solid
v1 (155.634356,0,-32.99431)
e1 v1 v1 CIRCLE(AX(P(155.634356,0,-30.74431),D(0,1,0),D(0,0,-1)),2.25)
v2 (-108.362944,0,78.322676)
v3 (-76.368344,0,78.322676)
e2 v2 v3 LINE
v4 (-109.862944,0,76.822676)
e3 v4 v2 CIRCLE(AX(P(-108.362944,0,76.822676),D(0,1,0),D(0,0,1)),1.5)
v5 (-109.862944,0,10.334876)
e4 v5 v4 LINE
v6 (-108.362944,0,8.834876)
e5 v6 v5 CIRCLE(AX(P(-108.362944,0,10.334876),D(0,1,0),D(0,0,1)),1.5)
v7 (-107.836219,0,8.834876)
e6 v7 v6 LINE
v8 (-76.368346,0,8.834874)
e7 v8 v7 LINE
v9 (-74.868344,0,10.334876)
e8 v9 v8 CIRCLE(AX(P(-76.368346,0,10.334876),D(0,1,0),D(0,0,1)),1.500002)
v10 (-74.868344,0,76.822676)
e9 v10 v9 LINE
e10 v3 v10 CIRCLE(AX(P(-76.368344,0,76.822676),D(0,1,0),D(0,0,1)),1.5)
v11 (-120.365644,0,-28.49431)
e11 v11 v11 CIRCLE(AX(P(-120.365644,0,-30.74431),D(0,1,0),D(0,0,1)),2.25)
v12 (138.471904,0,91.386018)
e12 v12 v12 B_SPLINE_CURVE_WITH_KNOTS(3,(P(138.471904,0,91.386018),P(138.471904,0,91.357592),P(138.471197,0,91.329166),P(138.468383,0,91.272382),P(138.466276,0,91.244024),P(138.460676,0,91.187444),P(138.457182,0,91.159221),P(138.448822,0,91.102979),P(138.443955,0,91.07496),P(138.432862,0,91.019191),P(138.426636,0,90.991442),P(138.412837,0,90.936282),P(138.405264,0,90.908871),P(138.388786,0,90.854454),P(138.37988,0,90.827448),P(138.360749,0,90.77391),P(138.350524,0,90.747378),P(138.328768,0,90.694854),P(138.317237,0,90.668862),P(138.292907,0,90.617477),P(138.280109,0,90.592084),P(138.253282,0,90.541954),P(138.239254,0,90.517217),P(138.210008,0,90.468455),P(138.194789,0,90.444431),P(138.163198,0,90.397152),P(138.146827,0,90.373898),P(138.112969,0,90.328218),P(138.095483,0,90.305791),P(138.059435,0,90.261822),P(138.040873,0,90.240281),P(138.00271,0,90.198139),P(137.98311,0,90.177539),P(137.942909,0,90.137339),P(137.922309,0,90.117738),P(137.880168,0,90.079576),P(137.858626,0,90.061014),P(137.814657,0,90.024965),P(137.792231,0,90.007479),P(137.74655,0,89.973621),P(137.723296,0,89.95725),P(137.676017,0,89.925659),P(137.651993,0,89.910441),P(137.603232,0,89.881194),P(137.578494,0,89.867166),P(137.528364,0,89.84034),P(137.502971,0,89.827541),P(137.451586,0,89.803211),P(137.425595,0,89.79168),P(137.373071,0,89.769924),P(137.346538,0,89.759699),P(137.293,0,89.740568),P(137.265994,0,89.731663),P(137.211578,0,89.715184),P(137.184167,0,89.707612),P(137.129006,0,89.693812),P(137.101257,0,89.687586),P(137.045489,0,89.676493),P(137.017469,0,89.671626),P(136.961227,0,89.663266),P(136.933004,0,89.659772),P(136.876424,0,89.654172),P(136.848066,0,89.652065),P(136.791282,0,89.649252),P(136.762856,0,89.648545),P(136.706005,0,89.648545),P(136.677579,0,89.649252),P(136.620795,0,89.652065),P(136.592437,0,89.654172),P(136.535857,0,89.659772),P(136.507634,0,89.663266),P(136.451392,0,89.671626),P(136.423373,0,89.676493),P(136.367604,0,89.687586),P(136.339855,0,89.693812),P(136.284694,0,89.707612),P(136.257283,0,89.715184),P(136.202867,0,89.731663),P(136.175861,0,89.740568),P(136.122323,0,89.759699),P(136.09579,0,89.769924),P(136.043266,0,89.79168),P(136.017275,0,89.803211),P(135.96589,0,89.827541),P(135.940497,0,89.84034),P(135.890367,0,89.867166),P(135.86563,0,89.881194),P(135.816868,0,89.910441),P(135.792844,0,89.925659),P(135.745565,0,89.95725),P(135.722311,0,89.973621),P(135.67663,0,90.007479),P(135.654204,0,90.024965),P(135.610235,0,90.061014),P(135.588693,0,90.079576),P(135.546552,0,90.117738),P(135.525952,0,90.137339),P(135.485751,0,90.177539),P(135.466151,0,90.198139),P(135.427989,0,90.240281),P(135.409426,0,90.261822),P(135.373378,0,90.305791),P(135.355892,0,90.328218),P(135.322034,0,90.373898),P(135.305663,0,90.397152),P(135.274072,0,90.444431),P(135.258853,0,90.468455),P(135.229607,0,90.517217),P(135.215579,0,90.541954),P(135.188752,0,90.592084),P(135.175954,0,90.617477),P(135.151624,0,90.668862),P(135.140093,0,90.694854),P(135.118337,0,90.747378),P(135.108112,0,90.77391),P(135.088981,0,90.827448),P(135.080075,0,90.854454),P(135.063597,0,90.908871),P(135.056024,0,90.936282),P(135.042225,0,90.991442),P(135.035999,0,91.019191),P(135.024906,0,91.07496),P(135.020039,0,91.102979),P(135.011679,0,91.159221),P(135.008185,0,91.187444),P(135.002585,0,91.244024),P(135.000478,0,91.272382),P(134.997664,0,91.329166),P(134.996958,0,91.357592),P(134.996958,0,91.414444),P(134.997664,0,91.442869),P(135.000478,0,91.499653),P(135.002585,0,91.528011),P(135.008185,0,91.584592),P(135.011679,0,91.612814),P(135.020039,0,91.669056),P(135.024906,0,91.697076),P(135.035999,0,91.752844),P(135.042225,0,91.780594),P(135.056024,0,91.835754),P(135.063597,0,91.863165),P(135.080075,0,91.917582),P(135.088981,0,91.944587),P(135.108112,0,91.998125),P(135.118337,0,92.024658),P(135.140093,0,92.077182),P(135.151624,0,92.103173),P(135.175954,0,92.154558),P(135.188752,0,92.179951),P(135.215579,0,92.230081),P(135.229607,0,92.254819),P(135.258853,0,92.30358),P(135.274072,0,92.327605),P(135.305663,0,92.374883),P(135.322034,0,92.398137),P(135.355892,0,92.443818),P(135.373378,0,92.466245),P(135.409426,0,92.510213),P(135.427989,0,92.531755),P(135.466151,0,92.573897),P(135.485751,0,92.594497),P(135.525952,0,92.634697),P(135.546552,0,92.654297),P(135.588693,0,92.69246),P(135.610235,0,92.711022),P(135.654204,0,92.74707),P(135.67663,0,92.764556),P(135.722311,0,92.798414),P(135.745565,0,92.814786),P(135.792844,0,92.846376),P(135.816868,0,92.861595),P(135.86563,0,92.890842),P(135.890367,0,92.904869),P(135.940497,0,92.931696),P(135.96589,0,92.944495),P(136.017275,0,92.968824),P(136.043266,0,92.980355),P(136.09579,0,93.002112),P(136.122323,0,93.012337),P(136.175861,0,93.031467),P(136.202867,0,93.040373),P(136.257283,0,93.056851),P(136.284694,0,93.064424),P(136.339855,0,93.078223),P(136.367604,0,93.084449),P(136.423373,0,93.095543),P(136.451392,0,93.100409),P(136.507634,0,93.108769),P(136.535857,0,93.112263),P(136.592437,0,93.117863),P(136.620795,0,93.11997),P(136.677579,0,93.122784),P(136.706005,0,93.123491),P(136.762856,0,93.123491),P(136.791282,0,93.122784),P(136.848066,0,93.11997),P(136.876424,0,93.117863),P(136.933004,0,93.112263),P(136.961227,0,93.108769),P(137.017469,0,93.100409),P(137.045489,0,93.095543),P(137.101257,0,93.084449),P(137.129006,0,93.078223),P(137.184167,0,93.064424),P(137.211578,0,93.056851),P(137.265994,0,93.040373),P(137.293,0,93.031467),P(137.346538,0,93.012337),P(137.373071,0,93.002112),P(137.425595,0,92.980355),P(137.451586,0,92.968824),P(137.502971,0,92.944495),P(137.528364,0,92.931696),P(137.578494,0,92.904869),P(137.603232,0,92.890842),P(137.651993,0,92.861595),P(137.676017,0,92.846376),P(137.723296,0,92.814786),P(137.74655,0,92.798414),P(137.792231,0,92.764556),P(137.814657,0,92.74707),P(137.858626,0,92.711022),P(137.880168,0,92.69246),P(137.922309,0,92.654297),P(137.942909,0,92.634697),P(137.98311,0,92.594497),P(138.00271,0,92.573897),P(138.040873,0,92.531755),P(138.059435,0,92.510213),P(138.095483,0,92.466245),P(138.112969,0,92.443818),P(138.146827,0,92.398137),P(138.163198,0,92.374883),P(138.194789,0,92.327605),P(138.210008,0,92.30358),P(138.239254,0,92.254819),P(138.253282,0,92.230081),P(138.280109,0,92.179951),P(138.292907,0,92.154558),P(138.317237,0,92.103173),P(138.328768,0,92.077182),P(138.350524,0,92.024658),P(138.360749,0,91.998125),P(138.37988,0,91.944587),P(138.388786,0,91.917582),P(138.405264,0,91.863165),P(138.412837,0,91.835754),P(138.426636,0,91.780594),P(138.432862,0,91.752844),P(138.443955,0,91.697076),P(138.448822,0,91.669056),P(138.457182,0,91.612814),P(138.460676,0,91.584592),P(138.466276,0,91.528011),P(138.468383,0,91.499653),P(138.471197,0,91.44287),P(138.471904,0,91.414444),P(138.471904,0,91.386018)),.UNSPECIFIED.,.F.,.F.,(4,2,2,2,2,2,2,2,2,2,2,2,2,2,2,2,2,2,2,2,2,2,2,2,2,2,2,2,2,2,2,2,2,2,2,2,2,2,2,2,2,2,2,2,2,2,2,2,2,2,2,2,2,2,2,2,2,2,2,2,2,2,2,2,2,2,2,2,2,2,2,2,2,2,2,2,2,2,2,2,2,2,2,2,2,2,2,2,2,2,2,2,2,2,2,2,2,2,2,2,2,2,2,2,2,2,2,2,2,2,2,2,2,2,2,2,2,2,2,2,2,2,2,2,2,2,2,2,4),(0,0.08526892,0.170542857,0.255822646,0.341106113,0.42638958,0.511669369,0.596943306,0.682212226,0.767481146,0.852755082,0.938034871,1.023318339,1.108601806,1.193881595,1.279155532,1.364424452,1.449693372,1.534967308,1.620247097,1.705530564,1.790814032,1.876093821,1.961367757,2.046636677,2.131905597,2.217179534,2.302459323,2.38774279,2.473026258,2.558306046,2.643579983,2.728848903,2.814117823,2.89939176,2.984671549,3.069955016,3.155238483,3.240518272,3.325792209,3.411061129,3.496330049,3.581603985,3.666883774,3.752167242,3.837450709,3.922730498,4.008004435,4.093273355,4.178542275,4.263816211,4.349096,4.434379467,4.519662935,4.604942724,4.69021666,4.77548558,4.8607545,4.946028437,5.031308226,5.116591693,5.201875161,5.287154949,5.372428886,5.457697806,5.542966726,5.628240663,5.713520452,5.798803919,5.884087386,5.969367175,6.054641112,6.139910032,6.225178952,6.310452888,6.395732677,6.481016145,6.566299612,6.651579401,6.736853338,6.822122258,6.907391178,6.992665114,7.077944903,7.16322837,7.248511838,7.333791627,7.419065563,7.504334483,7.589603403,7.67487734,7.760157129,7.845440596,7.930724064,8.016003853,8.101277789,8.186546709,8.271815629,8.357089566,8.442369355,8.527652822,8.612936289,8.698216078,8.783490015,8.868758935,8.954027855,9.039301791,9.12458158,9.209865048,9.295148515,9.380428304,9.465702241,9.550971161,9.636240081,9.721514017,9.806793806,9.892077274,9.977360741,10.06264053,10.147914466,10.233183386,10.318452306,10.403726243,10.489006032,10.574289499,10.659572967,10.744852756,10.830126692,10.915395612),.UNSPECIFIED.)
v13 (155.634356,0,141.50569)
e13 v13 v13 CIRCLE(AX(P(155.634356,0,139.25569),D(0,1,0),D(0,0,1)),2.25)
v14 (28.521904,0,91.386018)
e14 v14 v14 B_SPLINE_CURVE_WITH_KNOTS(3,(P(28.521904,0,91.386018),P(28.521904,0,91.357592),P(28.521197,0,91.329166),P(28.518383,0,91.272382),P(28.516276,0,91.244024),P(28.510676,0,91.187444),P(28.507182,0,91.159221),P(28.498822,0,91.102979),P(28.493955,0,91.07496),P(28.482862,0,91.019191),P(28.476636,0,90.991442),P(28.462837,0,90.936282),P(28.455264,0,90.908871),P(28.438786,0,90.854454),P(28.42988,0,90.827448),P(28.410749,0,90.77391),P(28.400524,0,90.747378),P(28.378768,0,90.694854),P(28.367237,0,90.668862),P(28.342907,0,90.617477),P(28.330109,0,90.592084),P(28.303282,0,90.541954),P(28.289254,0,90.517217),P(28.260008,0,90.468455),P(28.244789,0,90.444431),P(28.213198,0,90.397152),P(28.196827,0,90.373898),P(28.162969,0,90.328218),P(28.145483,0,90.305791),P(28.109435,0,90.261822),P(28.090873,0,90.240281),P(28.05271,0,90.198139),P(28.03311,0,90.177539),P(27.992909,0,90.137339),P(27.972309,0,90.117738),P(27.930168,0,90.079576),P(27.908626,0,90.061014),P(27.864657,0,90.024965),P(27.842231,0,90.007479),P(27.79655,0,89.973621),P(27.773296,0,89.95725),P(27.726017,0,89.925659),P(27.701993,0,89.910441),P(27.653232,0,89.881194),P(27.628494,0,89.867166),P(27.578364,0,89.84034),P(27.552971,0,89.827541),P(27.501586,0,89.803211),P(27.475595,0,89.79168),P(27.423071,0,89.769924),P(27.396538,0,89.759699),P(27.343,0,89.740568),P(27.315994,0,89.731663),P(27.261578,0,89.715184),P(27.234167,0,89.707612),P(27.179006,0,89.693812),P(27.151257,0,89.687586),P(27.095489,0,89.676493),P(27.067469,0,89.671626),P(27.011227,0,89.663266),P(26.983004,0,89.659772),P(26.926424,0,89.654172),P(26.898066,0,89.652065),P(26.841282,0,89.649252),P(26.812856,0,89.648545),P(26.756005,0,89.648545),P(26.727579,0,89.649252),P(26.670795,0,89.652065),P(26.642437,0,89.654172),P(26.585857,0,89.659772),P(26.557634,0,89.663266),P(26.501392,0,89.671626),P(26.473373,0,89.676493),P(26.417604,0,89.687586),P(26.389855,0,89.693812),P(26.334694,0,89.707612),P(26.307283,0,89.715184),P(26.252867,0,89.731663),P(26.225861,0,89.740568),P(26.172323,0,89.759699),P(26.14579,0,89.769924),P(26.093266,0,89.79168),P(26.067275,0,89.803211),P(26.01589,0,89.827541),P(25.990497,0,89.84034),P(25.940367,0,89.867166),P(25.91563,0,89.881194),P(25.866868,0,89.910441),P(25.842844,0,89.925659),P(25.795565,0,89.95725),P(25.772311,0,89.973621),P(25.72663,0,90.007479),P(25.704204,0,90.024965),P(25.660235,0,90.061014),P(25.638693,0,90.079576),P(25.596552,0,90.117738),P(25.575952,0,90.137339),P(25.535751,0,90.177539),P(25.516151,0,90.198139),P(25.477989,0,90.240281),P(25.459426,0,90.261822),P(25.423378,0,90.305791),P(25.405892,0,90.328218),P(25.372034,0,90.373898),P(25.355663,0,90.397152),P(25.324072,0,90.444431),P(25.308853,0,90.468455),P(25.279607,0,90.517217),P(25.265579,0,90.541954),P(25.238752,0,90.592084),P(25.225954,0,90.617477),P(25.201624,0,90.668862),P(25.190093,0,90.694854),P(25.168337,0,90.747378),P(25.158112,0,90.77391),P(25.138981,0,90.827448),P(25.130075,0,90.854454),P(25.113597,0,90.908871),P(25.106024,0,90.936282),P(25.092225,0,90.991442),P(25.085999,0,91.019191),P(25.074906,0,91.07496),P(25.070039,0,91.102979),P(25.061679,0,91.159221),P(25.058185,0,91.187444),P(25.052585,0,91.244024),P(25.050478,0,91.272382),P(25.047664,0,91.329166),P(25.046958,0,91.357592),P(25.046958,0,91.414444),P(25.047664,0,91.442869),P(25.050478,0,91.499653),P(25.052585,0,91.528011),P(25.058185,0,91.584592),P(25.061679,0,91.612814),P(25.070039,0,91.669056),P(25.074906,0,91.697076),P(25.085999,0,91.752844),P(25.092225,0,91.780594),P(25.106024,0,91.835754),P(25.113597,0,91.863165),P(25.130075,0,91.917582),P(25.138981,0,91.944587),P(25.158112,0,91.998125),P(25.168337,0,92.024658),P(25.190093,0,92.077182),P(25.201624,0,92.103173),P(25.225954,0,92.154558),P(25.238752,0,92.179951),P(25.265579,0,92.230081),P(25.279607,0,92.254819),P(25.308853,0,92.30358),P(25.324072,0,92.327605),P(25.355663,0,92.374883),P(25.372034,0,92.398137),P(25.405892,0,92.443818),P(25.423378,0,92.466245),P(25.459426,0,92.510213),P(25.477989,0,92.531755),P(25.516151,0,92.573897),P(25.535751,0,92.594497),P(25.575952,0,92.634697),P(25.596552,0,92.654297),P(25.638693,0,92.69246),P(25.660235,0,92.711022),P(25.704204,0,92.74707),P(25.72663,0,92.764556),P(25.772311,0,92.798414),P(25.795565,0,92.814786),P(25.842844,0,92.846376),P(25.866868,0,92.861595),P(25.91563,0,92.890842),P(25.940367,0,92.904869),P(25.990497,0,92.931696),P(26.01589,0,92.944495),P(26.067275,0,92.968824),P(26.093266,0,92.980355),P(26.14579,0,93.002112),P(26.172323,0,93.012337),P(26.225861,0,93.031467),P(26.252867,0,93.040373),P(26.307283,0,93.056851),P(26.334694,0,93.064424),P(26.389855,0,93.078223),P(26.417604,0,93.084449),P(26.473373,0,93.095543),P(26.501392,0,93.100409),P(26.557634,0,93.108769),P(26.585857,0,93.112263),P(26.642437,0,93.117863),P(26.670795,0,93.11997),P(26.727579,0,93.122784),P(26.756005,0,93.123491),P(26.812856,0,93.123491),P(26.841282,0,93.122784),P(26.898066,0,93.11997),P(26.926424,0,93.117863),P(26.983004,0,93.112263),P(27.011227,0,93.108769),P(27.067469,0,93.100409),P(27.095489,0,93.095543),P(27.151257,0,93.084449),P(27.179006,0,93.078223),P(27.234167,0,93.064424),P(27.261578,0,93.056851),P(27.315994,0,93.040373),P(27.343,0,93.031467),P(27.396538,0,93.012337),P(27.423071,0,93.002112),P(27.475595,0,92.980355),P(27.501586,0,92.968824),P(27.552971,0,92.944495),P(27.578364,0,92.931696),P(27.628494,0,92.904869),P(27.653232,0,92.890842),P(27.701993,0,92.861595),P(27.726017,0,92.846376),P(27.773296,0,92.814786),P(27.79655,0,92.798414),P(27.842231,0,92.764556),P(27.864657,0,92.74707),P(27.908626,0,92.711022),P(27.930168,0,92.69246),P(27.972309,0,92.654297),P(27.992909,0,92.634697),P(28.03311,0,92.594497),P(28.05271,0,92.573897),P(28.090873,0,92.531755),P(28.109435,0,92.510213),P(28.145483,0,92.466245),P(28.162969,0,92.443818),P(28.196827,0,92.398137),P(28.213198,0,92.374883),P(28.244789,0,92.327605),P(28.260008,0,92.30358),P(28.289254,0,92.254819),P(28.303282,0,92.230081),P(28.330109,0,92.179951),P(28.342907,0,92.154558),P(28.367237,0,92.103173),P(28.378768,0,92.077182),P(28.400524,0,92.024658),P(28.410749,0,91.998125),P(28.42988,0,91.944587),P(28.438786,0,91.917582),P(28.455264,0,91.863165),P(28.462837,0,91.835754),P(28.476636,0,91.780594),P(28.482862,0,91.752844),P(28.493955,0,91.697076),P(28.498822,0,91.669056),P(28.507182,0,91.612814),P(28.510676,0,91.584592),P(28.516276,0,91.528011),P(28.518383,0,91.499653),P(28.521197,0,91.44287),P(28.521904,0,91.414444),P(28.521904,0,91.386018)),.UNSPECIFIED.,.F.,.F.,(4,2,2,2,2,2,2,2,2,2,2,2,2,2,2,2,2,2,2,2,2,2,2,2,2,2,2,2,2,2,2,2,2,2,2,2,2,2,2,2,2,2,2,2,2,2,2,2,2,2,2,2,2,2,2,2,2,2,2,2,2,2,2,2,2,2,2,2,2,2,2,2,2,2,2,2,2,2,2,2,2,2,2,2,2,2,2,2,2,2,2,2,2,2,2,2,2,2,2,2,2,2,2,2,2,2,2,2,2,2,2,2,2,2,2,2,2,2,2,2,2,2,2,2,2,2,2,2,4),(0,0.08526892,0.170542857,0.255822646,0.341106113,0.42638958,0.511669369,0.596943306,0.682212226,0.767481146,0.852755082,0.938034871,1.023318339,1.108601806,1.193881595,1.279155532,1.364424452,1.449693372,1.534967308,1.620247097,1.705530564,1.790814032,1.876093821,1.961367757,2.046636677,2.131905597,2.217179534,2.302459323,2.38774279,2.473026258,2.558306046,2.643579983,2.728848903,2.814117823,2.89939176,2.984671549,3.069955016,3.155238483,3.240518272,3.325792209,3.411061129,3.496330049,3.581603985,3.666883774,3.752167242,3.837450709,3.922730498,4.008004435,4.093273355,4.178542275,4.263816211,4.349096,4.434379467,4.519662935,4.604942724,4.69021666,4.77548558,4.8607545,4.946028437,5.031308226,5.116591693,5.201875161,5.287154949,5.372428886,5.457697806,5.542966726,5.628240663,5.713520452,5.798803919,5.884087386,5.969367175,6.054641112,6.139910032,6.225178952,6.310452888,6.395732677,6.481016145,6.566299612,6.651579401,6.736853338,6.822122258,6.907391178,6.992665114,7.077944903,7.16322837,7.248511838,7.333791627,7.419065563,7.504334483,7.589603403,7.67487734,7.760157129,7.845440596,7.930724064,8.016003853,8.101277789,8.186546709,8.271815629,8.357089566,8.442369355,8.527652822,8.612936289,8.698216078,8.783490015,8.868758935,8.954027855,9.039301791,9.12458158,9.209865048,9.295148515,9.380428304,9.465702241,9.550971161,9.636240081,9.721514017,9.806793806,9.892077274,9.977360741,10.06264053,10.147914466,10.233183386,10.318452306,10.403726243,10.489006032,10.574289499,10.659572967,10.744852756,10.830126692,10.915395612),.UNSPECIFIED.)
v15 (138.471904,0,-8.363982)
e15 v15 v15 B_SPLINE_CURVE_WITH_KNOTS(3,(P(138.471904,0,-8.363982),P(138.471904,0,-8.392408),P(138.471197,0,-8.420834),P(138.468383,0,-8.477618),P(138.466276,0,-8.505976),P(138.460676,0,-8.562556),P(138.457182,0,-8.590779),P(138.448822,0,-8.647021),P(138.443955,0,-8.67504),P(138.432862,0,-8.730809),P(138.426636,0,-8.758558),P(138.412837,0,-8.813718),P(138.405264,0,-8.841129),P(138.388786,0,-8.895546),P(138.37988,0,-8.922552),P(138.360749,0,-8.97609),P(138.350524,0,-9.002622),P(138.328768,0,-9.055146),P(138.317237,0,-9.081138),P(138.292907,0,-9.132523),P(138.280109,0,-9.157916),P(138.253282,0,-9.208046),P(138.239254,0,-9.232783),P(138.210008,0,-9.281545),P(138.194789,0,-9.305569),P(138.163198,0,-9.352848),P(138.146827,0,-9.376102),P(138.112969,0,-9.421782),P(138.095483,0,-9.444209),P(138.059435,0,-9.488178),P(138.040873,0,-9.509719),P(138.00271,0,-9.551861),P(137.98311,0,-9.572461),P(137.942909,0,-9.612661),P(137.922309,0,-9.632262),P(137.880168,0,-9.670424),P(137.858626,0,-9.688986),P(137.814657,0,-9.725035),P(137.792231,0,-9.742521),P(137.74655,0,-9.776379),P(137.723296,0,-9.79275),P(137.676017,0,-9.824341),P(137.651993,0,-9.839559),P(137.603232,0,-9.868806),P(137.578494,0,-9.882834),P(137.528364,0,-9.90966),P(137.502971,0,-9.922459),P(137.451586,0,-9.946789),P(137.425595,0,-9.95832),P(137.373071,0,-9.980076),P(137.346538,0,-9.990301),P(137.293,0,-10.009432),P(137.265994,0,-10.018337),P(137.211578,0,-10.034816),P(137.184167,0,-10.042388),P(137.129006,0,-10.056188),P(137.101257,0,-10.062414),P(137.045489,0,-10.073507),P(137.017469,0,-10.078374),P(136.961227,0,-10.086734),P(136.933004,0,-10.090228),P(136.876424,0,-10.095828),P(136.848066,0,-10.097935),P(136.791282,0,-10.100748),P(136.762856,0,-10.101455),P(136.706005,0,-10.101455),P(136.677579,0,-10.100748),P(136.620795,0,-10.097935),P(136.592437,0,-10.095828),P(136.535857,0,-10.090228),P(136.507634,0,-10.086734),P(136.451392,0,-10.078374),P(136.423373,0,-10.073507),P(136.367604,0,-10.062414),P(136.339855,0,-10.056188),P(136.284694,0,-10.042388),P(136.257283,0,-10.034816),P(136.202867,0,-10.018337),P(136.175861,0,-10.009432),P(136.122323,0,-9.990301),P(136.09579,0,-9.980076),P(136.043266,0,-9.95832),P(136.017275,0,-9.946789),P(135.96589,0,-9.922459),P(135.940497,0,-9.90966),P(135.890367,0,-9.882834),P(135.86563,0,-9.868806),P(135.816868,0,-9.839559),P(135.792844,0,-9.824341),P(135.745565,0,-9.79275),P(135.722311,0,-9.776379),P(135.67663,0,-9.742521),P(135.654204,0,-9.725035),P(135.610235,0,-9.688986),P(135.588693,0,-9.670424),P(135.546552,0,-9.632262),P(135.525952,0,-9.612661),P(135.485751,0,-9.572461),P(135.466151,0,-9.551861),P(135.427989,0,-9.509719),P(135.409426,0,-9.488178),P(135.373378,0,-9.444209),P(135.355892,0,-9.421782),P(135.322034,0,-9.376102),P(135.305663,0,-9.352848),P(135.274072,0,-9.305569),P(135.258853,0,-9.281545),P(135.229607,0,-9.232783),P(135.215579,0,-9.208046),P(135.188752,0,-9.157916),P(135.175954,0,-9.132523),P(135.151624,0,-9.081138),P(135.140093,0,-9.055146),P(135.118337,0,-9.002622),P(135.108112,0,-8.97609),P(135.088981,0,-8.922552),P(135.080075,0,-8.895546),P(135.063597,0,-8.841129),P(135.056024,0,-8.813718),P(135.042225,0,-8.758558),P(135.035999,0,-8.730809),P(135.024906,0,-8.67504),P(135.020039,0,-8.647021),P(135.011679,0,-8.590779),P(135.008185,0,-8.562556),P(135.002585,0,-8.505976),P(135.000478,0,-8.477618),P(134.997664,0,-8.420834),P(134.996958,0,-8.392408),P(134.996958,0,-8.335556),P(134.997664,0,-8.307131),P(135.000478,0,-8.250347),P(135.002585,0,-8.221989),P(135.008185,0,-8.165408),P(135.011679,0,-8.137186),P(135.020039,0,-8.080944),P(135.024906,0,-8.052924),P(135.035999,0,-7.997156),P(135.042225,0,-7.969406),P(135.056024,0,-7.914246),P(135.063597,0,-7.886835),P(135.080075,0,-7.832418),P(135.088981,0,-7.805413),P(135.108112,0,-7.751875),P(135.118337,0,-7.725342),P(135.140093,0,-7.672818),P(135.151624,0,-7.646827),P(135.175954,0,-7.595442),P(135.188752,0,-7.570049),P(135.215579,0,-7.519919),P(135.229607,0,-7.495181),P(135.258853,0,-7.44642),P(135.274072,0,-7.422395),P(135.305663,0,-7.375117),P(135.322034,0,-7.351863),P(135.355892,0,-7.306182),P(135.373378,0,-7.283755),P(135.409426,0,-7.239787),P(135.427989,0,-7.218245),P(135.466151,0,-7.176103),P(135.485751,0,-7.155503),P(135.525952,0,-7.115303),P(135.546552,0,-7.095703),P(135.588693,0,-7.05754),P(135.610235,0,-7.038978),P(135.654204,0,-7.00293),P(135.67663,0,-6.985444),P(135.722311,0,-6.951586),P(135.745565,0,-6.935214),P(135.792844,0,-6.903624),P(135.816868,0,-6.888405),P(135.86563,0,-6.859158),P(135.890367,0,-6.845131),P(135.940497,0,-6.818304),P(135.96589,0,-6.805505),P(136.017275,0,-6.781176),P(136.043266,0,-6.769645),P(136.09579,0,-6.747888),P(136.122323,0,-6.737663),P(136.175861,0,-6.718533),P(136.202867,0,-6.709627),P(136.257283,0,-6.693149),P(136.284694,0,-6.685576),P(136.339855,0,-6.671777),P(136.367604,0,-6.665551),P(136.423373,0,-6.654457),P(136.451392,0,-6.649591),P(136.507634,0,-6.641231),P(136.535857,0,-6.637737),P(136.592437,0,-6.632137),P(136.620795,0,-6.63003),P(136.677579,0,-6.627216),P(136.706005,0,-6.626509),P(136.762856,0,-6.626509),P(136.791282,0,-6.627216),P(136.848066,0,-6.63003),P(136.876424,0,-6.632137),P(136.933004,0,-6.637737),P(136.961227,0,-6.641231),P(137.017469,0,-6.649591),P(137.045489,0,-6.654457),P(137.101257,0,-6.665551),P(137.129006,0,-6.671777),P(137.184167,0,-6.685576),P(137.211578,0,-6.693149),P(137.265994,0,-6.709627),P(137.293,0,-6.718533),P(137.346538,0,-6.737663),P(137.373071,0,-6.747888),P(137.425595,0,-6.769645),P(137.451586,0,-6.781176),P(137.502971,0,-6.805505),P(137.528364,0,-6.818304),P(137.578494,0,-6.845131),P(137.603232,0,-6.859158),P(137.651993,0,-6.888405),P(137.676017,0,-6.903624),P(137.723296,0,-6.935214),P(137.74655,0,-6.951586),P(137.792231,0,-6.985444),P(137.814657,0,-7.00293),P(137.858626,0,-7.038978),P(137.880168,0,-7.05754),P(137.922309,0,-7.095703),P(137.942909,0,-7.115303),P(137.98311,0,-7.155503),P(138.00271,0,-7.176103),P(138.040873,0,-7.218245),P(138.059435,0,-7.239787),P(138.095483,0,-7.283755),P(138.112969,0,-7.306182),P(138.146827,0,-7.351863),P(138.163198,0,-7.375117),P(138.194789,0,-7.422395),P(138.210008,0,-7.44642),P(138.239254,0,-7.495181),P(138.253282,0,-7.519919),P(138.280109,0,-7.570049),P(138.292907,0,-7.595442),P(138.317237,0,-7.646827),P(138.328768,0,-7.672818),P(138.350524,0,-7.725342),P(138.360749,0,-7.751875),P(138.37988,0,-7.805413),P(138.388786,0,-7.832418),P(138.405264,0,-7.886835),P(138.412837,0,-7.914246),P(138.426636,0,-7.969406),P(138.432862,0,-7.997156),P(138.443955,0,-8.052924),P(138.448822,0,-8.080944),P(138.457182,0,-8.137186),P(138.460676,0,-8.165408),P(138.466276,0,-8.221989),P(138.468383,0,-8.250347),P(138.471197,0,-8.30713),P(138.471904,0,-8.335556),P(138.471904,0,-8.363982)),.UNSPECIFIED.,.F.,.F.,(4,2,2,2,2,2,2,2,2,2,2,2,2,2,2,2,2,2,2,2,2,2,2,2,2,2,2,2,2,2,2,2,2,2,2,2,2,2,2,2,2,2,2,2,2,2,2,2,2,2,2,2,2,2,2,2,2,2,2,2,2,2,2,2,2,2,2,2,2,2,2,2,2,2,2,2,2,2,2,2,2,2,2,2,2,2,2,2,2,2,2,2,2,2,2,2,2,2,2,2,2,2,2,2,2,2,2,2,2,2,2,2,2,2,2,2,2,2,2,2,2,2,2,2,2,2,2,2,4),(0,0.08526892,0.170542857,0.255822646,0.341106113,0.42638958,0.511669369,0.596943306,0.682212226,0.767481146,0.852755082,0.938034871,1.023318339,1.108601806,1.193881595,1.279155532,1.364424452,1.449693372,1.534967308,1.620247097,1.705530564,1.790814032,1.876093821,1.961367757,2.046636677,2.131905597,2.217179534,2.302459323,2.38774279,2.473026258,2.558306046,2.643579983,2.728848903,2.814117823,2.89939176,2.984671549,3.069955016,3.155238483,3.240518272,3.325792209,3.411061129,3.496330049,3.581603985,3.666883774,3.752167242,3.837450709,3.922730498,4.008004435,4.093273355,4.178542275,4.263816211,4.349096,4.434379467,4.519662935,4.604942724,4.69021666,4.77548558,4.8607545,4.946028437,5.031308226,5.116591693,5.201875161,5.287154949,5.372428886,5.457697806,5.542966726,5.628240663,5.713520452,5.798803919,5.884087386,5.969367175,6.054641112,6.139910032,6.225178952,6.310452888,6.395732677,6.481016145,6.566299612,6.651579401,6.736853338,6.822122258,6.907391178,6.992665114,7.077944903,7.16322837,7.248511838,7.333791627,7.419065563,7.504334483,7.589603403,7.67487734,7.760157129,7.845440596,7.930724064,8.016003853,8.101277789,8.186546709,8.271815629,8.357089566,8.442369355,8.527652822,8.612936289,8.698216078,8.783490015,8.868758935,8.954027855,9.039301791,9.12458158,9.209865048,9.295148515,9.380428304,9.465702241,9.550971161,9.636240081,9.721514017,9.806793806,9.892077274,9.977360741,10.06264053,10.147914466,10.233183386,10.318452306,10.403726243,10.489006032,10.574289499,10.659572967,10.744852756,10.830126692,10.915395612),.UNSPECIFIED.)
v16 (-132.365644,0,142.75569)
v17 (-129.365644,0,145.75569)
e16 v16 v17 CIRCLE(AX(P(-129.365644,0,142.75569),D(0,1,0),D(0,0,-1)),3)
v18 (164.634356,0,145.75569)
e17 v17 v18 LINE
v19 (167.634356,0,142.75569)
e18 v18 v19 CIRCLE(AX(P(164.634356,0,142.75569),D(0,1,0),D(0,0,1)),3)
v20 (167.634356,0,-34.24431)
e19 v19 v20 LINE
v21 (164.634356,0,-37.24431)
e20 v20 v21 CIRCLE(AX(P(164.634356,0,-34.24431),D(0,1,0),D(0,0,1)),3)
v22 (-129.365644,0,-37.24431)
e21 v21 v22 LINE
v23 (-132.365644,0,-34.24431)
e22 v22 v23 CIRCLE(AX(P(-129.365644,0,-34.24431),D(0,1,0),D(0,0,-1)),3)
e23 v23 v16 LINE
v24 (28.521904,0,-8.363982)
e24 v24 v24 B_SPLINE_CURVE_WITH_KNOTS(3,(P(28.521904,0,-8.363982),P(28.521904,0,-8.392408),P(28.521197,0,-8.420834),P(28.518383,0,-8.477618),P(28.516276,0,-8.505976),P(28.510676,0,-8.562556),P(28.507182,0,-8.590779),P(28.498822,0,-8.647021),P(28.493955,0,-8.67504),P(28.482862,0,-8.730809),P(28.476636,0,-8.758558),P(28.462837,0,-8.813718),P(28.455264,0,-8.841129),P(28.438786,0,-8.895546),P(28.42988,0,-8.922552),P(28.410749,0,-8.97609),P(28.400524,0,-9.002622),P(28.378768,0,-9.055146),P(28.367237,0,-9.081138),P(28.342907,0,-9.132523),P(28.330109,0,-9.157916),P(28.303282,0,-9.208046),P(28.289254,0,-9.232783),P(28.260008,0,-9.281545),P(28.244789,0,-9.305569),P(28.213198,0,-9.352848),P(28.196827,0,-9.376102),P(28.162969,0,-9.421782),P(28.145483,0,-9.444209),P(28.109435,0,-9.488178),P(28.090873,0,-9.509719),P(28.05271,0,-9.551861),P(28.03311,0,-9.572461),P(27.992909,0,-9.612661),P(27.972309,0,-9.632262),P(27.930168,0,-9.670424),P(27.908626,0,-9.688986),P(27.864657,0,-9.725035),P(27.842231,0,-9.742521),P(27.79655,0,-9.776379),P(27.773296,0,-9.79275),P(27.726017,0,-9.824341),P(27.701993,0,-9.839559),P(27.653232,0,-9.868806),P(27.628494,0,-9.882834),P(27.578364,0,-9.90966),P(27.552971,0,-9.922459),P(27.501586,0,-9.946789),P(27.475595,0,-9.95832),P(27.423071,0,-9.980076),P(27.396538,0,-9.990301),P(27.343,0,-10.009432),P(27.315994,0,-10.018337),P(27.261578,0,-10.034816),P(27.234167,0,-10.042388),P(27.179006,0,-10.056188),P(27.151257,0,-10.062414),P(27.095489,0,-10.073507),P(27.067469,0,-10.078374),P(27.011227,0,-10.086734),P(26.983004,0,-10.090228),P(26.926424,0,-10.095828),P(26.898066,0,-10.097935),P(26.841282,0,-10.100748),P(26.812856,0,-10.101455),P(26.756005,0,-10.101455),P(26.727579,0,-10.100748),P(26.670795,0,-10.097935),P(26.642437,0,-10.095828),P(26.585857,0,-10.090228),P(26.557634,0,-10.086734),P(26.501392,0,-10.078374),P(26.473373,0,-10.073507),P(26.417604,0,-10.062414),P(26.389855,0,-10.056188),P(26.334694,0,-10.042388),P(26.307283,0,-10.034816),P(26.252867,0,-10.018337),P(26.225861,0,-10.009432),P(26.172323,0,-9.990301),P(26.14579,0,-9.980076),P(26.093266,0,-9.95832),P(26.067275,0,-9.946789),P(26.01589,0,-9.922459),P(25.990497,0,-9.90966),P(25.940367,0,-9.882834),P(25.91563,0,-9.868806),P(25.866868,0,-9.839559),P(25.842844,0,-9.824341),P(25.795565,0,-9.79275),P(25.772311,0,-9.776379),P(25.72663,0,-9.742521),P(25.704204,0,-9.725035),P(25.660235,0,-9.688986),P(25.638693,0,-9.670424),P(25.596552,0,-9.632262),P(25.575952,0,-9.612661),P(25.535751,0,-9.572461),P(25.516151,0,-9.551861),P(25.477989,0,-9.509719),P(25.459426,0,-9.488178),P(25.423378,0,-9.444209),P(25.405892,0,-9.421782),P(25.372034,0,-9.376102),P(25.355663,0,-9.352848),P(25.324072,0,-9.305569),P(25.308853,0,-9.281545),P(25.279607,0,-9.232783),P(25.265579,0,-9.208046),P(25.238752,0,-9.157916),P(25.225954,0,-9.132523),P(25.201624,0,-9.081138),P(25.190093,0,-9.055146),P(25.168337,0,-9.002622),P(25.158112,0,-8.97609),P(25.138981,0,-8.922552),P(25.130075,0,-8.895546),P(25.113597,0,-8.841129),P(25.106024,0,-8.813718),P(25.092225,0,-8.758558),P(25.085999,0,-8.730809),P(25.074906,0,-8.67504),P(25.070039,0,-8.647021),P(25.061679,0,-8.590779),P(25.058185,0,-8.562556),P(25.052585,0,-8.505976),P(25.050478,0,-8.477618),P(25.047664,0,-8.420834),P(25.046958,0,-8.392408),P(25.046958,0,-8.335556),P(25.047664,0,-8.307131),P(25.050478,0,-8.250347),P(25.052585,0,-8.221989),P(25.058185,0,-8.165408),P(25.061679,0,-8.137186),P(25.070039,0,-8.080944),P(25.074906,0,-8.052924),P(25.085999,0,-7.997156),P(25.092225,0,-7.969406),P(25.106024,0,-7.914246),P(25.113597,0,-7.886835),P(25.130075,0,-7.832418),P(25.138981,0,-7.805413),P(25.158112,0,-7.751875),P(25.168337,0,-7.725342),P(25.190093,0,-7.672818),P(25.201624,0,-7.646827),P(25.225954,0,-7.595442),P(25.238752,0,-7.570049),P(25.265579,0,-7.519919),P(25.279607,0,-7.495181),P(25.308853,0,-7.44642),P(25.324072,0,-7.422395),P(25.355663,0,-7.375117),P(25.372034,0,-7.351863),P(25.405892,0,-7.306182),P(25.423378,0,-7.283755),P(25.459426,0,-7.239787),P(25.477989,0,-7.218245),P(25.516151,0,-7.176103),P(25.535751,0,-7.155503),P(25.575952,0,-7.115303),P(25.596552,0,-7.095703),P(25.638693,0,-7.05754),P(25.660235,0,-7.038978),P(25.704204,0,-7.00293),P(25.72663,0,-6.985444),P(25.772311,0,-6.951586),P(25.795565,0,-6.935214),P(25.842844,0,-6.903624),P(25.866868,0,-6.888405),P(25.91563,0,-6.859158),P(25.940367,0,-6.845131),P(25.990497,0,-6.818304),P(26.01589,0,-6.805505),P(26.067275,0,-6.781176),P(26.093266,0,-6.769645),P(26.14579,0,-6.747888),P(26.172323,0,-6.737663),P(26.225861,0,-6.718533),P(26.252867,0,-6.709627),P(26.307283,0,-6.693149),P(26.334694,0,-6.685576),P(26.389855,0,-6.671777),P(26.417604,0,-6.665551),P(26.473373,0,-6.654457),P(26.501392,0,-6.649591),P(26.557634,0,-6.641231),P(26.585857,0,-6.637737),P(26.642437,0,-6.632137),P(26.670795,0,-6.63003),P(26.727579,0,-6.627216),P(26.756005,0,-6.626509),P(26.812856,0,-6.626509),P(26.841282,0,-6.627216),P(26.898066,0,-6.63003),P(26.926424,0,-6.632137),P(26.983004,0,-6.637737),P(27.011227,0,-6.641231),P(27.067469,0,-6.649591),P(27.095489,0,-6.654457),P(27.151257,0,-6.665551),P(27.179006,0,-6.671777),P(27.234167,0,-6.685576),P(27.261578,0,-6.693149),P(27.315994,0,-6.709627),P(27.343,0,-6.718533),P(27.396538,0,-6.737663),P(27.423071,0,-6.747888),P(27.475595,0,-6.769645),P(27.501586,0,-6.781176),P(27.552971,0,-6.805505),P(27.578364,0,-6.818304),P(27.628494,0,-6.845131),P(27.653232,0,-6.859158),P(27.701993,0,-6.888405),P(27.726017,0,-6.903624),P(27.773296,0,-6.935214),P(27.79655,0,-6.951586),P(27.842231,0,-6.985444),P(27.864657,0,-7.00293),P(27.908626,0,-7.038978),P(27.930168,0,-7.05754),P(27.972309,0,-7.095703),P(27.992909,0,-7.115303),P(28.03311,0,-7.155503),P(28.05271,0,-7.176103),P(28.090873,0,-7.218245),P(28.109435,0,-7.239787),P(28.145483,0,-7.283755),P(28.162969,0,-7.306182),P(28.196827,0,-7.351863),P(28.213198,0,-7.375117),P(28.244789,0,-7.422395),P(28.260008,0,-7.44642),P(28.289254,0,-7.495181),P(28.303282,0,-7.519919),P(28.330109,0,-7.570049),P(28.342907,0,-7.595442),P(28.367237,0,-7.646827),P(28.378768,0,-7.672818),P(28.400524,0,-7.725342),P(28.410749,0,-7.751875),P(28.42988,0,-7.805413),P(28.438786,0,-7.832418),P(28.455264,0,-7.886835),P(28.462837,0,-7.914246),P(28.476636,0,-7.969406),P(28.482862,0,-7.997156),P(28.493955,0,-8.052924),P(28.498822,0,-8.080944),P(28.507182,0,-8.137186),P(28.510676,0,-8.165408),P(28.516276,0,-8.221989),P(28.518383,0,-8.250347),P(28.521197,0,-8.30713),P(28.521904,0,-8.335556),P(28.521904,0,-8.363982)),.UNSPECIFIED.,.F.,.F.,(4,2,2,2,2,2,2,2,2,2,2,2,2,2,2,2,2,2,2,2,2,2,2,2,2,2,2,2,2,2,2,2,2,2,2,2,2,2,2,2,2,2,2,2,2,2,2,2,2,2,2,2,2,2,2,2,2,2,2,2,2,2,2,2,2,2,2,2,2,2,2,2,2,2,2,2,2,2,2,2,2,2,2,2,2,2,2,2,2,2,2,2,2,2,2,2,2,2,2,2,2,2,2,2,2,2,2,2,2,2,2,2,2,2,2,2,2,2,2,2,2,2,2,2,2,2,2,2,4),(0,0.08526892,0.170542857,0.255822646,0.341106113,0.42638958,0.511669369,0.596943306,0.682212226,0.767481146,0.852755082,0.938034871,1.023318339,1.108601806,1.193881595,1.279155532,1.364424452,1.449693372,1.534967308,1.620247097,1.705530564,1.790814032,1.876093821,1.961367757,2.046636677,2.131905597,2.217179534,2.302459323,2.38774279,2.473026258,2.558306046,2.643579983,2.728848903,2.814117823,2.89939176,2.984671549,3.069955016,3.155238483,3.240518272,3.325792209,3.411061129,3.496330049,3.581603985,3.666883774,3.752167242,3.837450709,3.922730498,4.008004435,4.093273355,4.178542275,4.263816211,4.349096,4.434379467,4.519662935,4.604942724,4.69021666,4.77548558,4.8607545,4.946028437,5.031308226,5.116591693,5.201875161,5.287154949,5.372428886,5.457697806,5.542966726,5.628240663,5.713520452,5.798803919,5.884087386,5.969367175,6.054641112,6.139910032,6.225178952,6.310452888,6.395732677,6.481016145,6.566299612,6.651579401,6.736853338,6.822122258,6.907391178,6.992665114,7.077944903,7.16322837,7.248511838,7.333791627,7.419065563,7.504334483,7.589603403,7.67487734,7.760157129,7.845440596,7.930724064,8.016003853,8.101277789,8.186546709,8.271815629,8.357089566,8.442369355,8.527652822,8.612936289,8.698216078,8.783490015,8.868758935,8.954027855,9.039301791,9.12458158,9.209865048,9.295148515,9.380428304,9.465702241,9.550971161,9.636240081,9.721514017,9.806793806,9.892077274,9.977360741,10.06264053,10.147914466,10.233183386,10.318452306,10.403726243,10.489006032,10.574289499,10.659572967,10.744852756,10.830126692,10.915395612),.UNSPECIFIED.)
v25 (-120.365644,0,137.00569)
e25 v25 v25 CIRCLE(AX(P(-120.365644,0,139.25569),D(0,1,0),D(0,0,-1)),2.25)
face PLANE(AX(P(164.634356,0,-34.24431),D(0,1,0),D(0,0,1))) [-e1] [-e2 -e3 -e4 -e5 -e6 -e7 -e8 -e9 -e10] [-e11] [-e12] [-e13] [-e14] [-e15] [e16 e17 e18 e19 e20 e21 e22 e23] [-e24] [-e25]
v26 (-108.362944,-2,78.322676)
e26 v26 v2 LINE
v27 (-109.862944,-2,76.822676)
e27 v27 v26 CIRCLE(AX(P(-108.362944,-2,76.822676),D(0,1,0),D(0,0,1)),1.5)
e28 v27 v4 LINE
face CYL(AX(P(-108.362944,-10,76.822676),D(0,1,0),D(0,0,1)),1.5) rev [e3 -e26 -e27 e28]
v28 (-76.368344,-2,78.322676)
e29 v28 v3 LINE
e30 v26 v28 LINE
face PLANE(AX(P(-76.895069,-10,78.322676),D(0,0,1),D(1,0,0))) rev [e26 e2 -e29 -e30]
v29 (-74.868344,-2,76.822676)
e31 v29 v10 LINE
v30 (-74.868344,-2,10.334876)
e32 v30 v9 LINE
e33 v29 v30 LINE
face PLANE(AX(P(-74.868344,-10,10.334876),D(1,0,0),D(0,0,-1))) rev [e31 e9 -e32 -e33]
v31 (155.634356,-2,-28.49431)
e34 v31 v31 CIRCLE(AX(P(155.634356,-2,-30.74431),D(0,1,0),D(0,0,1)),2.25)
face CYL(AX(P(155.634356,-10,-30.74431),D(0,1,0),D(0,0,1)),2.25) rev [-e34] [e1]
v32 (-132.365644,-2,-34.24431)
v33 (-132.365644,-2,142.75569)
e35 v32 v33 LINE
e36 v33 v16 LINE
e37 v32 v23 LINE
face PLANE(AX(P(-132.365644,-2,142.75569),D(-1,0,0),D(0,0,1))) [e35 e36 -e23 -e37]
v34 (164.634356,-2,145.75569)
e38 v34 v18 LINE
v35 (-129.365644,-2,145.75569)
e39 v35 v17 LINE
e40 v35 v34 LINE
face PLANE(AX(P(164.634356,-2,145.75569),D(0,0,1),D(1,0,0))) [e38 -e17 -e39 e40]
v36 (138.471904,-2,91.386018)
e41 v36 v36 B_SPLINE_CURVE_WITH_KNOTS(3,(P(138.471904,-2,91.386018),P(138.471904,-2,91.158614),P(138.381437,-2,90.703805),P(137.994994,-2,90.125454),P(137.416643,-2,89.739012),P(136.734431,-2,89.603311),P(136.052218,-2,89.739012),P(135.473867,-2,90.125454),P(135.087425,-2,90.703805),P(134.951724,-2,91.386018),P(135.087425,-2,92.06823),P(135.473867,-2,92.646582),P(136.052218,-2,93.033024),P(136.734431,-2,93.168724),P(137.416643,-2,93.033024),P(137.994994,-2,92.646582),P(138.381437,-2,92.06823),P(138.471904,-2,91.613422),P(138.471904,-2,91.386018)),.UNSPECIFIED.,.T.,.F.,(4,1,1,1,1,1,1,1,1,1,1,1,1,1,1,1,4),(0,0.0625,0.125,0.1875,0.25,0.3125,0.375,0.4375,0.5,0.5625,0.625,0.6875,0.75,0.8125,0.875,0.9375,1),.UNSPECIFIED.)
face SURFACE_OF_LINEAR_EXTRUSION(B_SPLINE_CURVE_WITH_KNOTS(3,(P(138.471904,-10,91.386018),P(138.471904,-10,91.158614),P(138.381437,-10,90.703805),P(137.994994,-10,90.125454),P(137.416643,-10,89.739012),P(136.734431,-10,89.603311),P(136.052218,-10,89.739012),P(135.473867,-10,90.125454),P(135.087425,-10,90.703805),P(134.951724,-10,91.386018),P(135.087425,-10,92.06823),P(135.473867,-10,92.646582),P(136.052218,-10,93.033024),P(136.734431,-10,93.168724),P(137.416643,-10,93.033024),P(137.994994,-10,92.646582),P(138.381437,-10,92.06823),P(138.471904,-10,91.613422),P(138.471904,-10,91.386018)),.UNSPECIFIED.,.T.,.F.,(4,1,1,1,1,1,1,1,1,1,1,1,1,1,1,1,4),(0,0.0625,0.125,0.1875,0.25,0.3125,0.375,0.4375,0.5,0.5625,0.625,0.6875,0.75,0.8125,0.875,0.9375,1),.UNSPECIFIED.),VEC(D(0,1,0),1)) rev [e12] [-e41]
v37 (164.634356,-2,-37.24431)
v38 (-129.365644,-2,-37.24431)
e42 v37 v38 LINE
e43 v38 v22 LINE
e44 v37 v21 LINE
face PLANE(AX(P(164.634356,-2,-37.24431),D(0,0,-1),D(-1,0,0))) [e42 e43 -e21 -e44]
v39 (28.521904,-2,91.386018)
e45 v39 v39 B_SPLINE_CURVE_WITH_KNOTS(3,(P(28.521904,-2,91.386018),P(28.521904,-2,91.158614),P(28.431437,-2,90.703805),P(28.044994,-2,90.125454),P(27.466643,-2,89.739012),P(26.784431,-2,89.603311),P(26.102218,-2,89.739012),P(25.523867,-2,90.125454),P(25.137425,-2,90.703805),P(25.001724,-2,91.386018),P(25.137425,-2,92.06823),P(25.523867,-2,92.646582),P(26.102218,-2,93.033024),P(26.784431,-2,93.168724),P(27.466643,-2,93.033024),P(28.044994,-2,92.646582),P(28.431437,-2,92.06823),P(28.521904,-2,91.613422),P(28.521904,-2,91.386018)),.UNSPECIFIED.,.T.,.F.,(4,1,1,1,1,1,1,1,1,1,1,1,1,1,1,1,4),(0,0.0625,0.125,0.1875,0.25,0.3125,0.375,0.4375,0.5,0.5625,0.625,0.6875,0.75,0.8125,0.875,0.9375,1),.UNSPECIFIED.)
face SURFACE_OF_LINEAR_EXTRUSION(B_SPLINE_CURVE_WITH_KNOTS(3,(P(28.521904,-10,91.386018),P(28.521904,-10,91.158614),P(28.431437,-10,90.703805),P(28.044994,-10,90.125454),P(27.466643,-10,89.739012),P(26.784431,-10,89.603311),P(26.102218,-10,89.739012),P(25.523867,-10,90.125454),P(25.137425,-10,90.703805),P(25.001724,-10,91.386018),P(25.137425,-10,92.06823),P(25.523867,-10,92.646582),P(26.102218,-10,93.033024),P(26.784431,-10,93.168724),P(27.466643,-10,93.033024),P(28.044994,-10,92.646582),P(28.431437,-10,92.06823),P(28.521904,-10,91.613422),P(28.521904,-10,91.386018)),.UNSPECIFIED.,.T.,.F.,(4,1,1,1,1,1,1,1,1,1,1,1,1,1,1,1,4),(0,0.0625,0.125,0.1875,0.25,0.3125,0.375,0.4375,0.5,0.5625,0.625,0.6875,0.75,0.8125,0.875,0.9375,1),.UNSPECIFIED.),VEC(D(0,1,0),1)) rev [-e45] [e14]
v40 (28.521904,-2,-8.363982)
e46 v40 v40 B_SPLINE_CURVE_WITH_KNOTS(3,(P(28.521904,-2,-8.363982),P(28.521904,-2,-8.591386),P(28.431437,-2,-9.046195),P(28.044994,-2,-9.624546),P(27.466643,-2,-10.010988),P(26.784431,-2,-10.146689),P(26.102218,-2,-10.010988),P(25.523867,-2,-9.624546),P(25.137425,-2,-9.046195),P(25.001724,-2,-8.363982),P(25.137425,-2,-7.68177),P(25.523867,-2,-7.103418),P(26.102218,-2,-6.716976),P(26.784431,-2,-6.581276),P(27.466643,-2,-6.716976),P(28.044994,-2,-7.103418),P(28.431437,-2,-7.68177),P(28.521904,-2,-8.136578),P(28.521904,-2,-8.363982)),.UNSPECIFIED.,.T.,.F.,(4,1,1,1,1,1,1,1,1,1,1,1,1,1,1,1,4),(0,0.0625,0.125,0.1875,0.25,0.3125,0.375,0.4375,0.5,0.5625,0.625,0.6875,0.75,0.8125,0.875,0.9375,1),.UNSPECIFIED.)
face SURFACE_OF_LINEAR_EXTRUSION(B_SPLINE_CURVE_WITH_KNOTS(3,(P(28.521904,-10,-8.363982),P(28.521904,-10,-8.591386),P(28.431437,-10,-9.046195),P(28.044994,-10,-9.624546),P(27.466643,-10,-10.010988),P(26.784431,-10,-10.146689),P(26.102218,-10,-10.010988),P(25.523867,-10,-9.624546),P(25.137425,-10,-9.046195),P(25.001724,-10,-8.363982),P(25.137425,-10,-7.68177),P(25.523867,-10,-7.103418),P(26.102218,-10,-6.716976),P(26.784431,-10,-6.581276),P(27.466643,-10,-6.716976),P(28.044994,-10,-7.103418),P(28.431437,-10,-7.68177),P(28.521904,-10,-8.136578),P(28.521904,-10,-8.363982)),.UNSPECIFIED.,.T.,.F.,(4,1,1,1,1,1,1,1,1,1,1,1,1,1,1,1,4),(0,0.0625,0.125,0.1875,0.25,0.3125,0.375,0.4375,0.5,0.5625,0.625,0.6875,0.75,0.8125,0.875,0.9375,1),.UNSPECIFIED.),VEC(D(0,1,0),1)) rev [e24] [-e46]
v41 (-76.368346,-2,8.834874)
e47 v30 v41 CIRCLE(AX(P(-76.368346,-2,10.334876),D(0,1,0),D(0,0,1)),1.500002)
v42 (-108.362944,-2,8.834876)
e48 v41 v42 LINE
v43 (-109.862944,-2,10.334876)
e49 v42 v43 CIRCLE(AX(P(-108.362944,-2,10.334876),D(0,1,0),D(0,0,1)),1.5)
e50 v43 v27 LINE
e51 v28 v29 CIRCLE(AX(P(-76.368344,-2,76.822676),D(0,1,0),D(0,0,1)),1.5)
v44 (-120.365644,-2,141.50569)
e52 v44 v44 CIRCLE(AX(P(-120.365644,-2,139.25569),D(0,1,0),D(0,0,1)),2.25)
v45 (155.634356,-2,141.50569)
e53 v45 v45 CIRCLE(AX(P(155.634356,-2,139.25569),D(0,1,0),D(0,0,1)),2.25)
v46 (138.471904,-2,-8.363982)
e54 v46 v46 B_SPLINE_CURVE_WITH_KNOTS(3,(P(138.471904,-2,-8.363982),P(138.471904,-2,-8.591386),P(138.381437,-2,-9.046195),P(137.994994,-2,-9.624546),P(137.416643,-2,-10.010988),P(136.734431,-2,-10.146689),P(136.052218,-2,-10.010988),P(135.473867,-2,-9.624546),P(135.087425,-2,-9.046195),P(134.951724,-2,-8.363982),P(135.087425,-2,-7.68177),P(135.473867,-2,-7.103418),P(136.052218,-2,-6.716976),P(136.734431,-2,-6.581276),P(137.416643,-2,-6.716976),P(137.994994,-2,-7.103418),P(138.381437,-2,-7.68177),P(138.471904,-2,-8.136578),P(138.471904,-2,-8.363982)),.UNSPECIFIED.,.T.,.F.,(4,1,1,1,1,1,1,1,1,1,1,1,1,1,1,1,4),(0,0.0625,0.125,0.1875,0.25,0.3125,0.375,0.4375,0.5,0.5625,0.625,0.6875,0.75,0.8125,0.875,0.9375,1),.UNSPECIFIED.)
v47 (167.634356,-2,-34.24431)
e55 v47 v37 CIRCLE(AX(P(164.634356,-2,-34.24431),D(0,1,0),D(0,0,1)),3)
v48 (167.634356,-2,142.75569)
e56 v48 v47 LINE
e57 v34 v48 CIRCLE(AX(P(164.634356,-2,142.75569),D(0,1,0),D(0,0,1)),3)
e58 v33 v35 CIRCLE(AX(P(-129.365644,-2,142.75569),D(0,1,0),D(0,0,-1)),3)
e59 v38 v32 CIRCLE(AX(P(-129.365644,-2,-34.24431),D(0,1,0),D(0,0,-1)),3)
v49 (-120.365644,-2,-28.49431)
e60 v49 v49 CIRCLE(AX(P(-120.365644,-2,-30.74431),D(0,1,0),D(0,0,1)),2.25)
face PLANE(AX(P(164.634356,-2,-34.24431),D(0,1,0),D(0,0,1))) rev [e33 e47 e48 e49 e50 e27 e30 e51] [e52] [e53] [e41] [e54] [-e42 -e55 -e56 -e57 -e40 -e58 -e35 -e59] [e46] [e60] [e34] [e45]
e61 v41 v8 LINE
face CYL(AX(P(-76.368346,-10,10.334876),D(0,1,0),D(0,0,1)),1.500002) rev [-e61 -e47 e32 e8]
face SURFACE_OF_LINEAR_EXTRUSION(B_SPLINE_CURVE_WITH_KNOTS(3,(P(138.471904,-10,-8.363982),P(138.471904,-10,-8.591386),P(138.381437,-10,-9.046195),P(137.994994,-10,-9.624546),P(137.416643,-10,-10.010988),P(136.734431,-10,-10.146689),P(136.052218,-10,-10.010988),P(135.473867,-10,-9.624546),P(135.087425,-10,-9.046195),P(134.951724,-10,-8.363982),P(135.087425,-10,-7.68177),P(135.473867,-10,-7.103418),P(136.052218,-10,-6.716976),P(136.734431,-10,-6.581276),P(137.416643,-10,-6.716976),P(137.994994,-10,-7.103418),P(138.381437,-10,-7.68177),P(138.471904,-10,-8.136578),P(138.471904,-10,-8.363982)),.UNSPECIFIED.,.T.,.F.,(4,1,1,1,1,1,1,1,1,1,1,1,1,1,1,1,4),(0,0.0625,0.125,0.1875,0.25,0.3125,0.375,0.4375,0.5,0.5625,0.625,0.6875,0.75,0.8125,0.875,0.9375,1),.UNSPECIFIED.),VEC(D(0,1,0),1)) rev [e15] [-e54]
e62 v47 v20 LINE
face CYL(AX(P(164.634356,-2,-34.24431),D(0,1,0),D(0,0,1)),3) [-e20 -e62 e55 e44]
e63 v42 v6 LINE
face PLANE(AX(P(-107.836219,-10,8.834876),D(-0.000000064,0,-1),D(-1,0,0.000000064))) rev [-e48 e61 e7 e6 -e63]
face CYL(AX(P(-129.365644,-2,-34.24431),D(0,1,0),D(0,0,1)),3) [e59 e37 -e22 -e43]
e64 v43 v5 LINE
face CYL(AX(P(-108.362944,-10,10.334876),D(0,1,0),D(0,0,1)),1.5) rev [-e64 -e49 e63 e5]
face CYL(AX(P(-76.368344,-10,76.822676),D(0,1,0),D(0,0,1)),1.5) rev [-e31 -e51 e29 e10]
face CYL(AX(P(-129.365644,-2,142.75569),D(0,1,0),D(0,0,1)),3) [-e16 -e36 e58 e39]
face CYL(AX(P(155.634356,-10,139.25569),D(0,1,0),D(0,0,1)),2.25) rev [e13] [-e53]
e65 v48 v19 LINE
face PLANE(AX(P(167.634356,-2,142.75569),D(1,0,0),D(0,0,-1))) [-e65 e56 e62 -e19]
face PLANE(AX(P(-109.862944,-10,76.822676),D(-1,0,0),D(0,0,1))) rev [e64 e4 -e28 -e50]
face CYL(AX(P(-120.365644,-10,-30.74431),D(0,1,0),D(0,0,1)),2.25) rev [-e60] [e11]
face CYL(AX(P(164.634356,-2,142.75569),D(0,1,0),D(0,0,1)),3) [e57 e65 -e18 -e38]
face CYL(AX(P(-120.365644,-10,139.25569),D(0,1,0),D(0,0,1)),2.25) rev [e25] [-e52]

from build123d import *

# Parameters (mm, degrees)
BASE_FLANGE2_DEPTH = 2
SKETCH2_R          = 2.25
CUT_EXTRUDE4_DEPTH = 10
CUT_EXTRUDE3_DEPTH = 10
CUT_EXTRUDE5_DEPTH = 10


# Sheet-metal steps are written as plain solids
with BuildPart() as part:
    # Sketch1 → Base-Flange2 (new body)
    with BuildSketch(Plane(origin=(0, 0, 0), x_dir=(1, 0, 0), z_dir=(0, 1, 0))):
        with BuildLine():
            Line((164.634355994, -145.755690278), (-129.365644006, -145.755690278))
            ThreePointArc((-129.365644006, -145.755690278), (-131.486964349, -144.877010621), (-132.365644006, -142.755690278))
            Line((-132.365644006, -142.755690278), (-132.365644006, 34.244309722))
            ThreePointArc((-132.365644006, 34.244309722), (-131.486964349, 36.365630066), (-129.365644006, 37.244309722))
            Line((-129.365644006, 37.244309722), (164.634355994, 37.244309722))
            ThreePointArc((164.634355994, 37.244309722), (166.755676338, 36.365630066), (167.634355994, 34.244309722))
            Line((167.634355994, 34.244309722), (167.634355994, -142.755690278))
            ThreePointArc((167.634355994, -142.755690278), (166.755676338, -144.877010621), (164.634355994, -145.755690278))
        make_face()
    extrude(amount=-BASE_FLANGE2_DEPTH)

    # Sketch2 → Cut-Extrude4 (cut)
    with BuildSketch(Plane(origin=(0, 0, 0), x_dir=(1, 0, 0), z_dir=(0, 1, 0))):
        with Locations(Location((-120.365644006, 30.744309722, 0), (0, 0, 270))):
            Circle(SKETCH2_R)
        with Locations(Location((-120.365644006, -139.255690278, 0), (0, 0, 270))):
            Circle(SKETCH2_R)
        with Locations(Location((155.634355994, -139.255690278, 0), (0, 0, 270))):
            Circle(SKETCH2_R)
        with Locations(Location((155.634355994, 30.744309722, 0), (0, 0, 270))):
            Circle(SKETCH2_R)
    extrude(amount=-CUT_EXTRUDE4_DEPTH, mode=Mode.SUBTRACT)

    # Sketch3 → Cut-Extrude3 (cut)
    with BuildSketch(Plane(origin=(0, 0, 0), x_dir=(1, 0, 0), z_dir=(0, 1, 0))):
        with BuildLine():
            Line((-107.836218664, -8.834875742), (-76.368346069, -8.834873742))
            ThreePointArc((-76.368346069, -8.834873742), (-75.307684442, -9.274214133), (-74.868344006, -10.334875742))
            Line((-74.868344006, -10.334875742), (-74.868344006, -76.822675742))
            ThreePointArc((-74.868344006, -76.822675742), (-75.307683834, -77.883335913), (-76.368344006, -78.322675742))
            Line((-76.368344006, -78.322675742), (-76.895069411, -78.322675742))
            Line((-76.895069411, -78.322675742), (-107.836218601, -78.322675742))
            Line((-107.836218601, -78.322675742), (-108.362944006, -78.322675742))
            ThreePointArc((-108.362944006, -78.322675742), (-109.423604177, -77.883335913), (-109.862944006, -76.822675742))
            Line((-109.862944006, -76.822675742), (-109.862944006, -10.334875742))
            ThreePointArc((-109.862944006, -10.334875742), (-109.423604177, -9.27421557), (-108.362944006, -8.834875742))
            Line((-108.362944006, -8.834875742), (-107.836218664, -8.834875742))
        make_face()
    extrude(amount=-CUT_EXTRUDE3_DEPTH, mode=Mode.SUBTRACT)

    # Sketch6 → Cut-Extrude5 (cut)
    with BuildSketch(Plane(origin=(0, 0, 0), x_dir=(1, 0, 0), z_dir=(0, 1, 0))):
        with BuildLine():
            add(Edge.make_bspline(
                [(28.521903533, -91.386017736), (28.521903533, -91.158613657), (28.431436566, -90.7038055), (28.044994377, -90.125453892), (27.466642769, -89.739011703), (26.784430533, -89.603311252), (26.102218297, -89.739011703), (25.52386669, -90.125453892), (25.1374245, -90.7038055), (25.00172405, -91.386017736), (25.1374245, -92.068229972), (25.52386669, -92.646581579), (26.102218297, -93.033023768), (26.784430533, -93.168724219), (27.466642769, -93.033023768), (28.044994377, -92.646581579), (28.431436566, -92.068229972), (28.521903533, -91.613421814), (28.521903533, -91.386017736)],
                knots=[0, 0, 0, 0, 0.0625, 0.125, 0.1875, 0.25, 0.3125, 0.375, 0.4375, 0.5, 0.5625, 0.625, 0.6875, 0.75, 0.8125, 0.875, 0.9375, 1, 1, 1, 1], degree=3))
        make_face()
        with BuildLine():
            add(Edge.make_bspline(
                [(138.471903533, 8.363982264), (138.471903533, 8.591386343), (138.381436566, 9.0461945), (137.994994377, 9.624546108), (137.416642769, 10.010988297), (136.734430533, 10.146688748), (136.052218297, 10.010988297), (135.47386669, 9.624546108), (135.0874245, 9.0461945), (134.95172405, 8.363982264), (135.0874245, 7.681770028), (135.47386669, 7.103418421), (136.052218297, 6.716976232), (136.734430533, 6.581275781), (137.416642769, 6.716976232), (137.994994377, 7.103418421), (138.381436566, 7.681770028), (138.471903533, 8.136578186), (138.471903533, 8.363982264)],
                knots=[0, 0, 0, 0, 0.0625, 0.125, 0.1875, 0.25, 0.3125, 0.375, 0.4375, 0.5, 0.5625, 0.625, 0.6875, 0.75, 0.8125, 0.875, 0.9375, 1, 1, 1, 1], degree=3))
        make_face()
        with BuildLine():
            add(Edge.make_bspline(
                [(28.521903533, 8.363982264), (28.521903533, 8.591386343), (28.431436566, 9.0461945), (28.044994377, 9.624546108), (27.466642769, 10.010988297), (26.784430533, 10.146688748), (26.102218297, 10.010988297), (25.52386669, 9.624546108), (25.1374245, 9.0461945), (25.00172405, 8.363982264), (25.1374245, 7.681770028), (25.52386669, 7.103418421), (26.102218297, 6.716976232), (26.784430533, 6.581275781), (27.466642769, 6.716976232), (28.044994377, 7.103418421), (28.431436566, 7.681770028), (28.521903533, 8.136578186), (28.521903533, 8.363982264)],
                knots=[0, 0, 0, 0, 0.0625, 0.125, 0.1875, 0.25, 0.3125, 0.375, 0.4375, 0.5, 0.5625, 0.625, 0.6875, 0.75, 0.8125, 0.875, 0.9375, 1, 1, 1, 1], degree=3))
        make_face()
        with BuildLine():
            add(Edge.make_bspline(
                [(138.471903533, -91.386017736), (138.471903533, -91.158613657), (138.381436566, -90.7038055), (137.994994377, -90.125453892), (137.416642769, -89.739011703), (136.734430533, -89.603311252), (136.052218297, -89.739011703), (135.47386669, -90.125453892), (135.0874245, -90.7038055), (134.95172405, -91.386017736), (135.0874245, -92.068229972), (135.47386669, -92.646581579), (136.052218297, -93.033023768), (136.734430533, -93.168724219), (137.416642769, -93.033023768), (137.994994377, -92.646581579), (138.381436566, -92.068229972), (138.471903533, -91.613421814), (138.471903533, -91.386017736)],
                knots=[0, 0, 0, 0, 0.0625, 0.125, 0.1875, 0.25, 0.3125, 0.375, 0.4375, 0.5, 0.5625, 0.625, 0.6875, 0.75, 0.8125, 0.875, 0.9375, 1, 1, 1, 1], degree=3))
        make_face()
    extrude(amount=-CUT_EXTRUDE5_DEPTH, mode=Mode.SUBTRACT)


solid = part.part
